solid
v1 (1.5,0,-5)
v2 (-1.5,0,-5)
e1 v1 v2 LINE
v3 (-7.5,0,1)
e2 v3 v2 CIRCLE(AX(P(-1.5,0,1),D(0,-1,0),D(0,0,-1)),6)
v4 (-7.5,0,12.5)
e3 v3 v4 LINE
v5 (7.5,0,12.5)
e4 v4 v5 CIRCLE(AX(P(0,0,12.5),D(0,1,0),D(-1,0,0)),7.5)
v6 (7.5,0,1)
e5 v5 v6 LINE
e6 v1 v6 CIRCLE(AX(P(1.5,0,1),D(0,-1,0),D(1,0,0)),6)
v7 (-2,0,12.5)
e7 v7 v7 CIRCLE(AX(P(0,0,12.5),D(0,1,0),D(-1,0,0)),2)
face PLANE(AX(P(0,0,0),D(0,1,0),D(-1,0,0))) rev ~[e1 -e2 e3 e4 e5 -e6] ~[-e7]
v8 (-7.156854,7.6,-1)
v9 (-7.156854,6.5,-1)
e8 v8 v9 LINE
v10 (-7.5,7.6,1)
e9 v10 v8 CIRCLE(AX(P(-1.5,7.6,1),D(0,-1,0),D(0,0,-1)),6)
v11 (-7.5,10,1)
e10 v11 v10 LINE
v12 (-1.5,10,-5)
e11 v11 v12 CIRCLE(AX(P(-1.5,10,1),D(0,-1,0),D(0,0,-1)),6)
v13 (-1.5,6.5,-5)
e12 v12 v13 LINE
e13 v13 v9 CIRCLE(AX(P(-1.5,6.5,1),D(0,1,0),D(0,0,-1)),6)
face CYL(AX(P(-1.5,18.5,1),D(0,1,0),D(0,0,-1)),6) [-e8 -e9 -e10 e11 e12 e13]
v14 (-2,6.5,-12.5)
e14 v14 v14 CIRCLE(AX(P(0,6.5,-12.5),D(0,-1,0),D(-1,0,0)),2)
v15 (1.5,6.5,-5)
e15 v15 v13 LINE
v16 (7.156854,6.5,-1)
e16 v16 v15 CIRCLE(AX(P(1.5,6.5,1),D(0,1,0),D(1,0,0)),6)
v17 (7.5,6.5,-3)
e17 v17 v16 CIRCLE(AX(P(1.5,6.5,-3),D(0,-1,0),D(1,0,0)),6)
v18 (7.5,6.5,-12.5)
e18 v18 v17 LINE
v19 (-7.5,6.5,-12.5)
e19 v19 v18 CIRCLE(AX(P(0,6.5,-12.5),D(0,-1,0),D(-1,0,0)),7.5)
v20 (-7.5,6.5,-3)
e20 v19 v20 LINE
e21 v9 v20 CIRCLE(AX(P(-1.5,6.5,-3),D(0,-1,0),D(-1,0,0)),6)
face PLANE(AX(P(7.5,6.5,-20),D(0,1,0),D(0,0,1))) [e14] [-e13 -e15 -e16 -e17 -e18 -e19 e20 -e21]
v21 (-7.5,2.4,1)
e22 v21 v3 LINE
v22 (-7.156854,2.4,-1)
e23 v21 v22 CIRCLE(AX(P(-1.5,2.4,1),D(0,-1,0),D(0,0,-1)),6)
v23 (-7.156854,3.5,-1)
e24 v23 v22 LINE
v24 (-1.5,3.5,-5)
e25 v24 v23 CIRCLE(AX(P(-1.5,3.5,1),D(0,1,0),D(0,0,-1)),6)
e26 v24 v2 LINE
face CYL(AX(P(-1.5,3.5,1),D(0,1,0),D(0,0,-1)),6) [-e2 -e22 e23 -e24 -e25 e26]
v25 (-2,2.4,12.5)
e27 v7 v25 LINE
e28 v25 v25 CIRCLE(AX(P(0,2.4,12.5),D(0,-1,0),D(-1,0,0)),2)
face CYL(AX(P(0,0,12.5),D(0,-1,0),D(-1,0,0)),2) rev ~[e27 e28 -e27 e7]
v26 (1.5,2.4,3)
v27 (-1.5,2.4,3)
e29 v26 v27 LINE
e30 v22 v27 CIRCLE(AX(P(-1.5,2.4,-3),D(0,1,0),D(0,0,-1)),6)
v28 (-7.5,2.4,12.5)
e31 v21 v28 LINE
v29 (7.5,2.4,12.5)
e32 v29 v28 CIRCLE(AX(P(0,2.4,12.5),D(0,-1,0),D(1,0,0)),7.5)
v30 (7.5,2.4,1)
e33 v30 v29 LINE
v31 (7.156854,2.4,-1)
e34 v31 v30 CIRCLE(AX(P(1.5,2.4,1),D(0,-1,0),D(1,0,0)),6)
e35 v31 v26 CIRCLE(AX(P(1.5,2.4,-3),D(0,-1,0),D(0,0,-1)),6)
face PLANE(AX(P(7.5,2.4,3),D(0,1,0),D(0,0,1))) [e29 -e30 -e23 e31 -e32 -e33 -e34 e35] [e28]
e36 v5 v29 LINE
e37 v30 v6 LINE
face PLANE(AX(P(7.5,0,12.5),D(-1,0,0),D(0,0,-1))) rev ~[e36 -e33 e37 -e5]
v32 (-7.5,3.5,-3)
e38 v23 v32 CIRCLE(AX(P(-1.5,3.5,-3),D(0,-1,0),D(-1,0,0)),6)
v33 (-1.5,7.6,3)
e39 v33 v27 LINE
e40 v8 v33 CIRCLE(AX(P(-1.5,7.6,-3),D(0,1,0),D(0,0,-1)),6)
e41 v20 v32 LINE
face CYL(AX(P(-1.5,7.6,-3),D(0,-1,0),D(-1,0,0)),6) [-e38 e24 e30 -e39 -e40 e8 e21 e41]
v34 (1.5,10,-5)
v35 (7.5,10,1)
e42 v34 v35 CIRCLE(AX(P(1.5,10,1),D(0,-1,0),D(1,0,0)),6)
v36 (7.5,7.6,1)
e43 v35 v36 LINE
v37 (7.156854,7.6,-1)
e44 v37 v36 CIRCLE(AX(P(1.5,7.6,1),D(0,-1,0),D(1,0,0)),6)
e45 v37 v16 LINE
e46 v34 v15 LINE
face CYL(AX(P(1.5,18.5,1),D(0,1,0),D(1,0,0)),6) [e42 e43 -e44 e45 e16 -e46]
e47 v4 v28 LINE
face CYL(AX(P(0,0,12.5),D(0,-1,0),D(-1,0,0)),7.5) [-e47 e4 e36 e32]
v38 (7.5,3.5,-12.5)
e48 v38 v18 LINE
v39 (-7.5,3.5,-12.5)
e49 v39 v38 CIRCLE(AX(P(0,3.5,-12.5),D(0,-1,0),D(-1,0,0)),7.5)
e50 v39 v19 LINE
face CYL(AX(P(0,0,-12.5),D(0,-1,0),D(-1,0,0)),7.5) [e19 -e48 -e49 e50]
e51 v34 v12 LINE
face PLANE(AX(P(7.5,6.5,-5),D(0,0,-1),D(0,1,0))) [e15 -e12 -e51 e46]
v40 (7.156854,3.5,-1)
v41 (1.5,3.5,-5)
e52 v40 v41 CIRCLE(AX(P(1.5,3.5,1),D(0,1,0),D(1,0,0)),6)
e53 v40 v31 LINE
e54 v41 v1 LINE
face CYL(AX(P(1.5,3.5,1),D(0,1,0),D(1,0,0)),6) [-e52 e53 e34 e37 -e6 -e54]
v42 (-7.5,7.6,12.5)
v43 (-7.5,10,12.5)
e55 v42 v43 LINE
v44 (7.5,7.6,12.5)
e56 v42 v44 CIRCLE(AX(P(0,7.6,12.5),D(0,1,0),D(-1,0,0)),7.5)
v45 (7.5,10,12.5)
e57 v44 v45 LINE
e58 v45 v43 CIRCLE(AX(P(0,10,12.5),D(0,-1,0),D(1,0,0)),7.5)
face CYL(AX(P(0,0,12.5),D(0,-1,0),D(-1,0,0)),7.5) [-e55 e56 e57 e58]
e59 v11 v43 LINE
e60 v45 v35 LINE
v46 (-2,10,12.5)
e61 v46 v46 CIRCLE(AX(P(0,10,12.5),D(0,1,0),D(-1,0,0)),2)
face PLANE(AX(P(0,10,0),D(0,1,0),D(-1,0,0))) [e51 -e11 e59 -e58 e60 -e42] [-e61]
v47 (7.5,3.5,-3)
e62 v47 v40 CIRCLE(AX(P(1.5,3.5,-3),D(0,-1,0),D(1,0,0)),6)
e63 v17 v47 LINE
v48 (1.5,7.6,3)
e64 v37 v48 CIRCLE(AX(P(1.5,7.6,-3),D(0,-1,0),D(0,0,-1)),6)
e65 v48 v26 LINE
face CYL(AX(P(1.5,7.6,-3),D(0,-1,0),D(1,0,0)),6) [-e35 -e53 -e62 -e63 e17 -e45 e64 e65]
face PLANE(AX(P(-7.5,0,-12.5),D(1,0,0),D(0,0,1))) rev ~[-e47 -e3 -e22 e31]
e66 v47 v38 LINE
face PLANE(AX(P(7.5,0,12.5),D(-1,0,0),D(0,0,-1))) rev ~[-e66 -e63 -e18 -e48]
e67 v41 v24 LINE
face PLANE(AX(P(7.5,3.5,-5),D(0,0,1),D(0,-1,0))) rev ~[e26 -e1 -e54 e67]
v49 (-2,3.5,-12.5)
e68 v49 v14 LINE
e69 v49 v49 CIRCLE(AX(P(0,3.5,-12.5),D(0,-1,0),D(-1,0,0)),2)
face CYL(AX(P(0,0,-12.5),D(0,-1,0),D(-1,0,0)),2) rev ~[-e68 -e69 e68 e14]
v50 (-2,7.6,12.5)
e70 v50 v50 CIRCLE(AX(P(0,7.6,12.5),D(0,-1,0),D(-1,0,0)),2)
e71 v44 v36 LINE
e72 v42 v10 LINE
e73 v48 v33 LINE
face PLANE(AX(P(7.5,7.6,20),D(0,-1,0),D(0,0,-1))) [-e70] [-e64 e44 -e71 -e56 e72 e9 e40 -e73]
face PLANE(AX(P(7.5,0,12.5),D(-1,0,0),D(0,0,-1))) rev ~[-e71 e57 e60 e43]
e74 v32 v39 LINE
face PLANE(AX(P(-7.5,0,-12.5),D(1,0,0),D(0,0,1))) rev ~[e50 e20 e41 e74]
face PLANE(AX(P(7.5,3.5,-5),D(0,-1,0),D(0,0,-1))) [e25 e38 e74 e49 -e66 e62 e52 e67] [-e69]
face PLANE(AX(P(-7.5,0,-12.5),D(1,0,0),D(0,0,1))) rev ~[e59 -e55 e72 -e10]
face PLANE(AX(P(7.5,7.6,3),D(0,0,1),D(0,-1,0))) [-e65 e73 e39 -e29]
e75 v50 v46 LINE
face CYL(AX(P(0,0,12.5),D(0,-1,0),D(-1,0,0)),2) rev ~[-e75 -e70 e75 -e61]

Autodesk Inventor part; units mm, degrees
ref_plane "YZ Plane" through (0, 0, 0) normal (1, 0, 0) x (0, 1, 0)
ref_plane "XZ Plane" through (0, 0, 0) normal (0, 1, 0) x (-1, 0, 0)
ref_plane "XY Plane" through (0, 0, 0) normal (0, 0, 1) x (1, 0, 0)
sketch "Sketch1" plane through (0, 0, 0) normal (0, 1, 0) x (-1, 0, 0)
  line L0 (7.5, 20) -> (-7.5, 20)
  line L1 (-7.5, 20) -> (-7.5, -20)
  line L2 (-7.5, -20) -> (7.5, -20)
  line L3 (7.5, -20) -> (7.5, 20)
  circle A0 centre (0, -12.5) radius 7.5
  circle A1 centre (0, 12.5) radius 7.5
  circle A2 centre (0, 12.5) radius 2
  circle A3 centre (0, -12.5) radius 2
  point P0 (0, 0)
  point P1 (7.5, 0)
  point P2 (0, -20)
  point P3 (7.5, 12.5)
  point P4 (-7.5, 12.5)
  point P5 (-7.5, -12.5)
  point P6 (7.5, -12.5)
  dimension "d0" = 15
  dimension "d2" = 25
  dimension "d3" = 4
  dimension "d4" = 4
extrude "Extrusion1" add sketch "Sketch1" along normal blind 10 contours A1 | L3 A0 L1 A1 | A0
sketch "Sketch2" plane through (7.5, 0, 12.5) normal (1, 0, 0) x (0, 0, -1)
  line L0 (-7.5, 0) -> (-7.5, 10) projected
  line L1 (-7.5, 7.6) -> (9.5, 7.6)
  line L2 (9.5, 7.6) -> (9.5, 2.4)
  line L3 (9.5, 2.4) -> (-7.5, 2.4)
  line L4 (-7.5, 2.4) -> (-7.5, 7.6)
  point P0 (12.5, 0)
  point P1 (-7.5, 5)
  point P2 (-7.5, 5)
  dimension "d7" = 17
  dimension "d8" = 5.2
extrude "Extrusion2" cut sketch "Sketch2" against normal through all
fillet "Fillet1" radius 6 2 edges at (7.5, 5, 3) (-7.5, 5, 3)
sketch "Sketch4" plane through (7.5, 0, 12.5) normal (1, 0, 0) x (0, 0, -1)
  line L0 (32.5, 0) -> (32.5, 10) projected
  line L1 (32.5, 6.5) -> (17.5, 6.5)
  line L2 (17.5, 6.5) -> (17.5, 3.5)
  line L3 (17.5, 3.5) -> (32.5, 3.5)
  line L4 (32.5, 3.5) -> (32.5, 6.5)
  line L5 (15.5, 2.4) -> (15.5, 7.6) projected
  line L6 (0, 0) -> (25, 0) projected
  line L7 (32.5, 3.5) -> (17.5, 3.5)
  line L8 (17.5, 3.5) -> (17.5, 0)
  line L9 (17.5, 0) -> (32.5, 0)
  line L10 (32.5, 0) -> (32.5, 3.5)
  line L11 (25, 10) -> (0, 10) projected
  line L12 (32.5, 6.5) -> (17.5, 6.5)
  line L13 (17.5, 6.5) -> (17.5, 10)
  line L14 (17.5, 10) -> (32.5, 10)
  line L15 (32.5, 10) -> (32.5, 6.5)
  point P0 (12.5, 0)
  point P1 (17.5, 5)
  point P2 (15.5, 5)
  point P3 (17.5, 1.75)
  dimension "d15" = 3
  dimension "d16" = 15
extrude "Extrusion4" cut sketch "Sketch4" against normal through all contours L9 L6 L8 L3 L0 | L1 L13 L11 L14 L0
fillet "Fillet2" radius 6 4 edges at (7.5, 1.75, -5) (7.5, 8.25, -5) (-7.5, 1.75, -5) (-7.5, 8.25, -5)
properties part number "coupler"
